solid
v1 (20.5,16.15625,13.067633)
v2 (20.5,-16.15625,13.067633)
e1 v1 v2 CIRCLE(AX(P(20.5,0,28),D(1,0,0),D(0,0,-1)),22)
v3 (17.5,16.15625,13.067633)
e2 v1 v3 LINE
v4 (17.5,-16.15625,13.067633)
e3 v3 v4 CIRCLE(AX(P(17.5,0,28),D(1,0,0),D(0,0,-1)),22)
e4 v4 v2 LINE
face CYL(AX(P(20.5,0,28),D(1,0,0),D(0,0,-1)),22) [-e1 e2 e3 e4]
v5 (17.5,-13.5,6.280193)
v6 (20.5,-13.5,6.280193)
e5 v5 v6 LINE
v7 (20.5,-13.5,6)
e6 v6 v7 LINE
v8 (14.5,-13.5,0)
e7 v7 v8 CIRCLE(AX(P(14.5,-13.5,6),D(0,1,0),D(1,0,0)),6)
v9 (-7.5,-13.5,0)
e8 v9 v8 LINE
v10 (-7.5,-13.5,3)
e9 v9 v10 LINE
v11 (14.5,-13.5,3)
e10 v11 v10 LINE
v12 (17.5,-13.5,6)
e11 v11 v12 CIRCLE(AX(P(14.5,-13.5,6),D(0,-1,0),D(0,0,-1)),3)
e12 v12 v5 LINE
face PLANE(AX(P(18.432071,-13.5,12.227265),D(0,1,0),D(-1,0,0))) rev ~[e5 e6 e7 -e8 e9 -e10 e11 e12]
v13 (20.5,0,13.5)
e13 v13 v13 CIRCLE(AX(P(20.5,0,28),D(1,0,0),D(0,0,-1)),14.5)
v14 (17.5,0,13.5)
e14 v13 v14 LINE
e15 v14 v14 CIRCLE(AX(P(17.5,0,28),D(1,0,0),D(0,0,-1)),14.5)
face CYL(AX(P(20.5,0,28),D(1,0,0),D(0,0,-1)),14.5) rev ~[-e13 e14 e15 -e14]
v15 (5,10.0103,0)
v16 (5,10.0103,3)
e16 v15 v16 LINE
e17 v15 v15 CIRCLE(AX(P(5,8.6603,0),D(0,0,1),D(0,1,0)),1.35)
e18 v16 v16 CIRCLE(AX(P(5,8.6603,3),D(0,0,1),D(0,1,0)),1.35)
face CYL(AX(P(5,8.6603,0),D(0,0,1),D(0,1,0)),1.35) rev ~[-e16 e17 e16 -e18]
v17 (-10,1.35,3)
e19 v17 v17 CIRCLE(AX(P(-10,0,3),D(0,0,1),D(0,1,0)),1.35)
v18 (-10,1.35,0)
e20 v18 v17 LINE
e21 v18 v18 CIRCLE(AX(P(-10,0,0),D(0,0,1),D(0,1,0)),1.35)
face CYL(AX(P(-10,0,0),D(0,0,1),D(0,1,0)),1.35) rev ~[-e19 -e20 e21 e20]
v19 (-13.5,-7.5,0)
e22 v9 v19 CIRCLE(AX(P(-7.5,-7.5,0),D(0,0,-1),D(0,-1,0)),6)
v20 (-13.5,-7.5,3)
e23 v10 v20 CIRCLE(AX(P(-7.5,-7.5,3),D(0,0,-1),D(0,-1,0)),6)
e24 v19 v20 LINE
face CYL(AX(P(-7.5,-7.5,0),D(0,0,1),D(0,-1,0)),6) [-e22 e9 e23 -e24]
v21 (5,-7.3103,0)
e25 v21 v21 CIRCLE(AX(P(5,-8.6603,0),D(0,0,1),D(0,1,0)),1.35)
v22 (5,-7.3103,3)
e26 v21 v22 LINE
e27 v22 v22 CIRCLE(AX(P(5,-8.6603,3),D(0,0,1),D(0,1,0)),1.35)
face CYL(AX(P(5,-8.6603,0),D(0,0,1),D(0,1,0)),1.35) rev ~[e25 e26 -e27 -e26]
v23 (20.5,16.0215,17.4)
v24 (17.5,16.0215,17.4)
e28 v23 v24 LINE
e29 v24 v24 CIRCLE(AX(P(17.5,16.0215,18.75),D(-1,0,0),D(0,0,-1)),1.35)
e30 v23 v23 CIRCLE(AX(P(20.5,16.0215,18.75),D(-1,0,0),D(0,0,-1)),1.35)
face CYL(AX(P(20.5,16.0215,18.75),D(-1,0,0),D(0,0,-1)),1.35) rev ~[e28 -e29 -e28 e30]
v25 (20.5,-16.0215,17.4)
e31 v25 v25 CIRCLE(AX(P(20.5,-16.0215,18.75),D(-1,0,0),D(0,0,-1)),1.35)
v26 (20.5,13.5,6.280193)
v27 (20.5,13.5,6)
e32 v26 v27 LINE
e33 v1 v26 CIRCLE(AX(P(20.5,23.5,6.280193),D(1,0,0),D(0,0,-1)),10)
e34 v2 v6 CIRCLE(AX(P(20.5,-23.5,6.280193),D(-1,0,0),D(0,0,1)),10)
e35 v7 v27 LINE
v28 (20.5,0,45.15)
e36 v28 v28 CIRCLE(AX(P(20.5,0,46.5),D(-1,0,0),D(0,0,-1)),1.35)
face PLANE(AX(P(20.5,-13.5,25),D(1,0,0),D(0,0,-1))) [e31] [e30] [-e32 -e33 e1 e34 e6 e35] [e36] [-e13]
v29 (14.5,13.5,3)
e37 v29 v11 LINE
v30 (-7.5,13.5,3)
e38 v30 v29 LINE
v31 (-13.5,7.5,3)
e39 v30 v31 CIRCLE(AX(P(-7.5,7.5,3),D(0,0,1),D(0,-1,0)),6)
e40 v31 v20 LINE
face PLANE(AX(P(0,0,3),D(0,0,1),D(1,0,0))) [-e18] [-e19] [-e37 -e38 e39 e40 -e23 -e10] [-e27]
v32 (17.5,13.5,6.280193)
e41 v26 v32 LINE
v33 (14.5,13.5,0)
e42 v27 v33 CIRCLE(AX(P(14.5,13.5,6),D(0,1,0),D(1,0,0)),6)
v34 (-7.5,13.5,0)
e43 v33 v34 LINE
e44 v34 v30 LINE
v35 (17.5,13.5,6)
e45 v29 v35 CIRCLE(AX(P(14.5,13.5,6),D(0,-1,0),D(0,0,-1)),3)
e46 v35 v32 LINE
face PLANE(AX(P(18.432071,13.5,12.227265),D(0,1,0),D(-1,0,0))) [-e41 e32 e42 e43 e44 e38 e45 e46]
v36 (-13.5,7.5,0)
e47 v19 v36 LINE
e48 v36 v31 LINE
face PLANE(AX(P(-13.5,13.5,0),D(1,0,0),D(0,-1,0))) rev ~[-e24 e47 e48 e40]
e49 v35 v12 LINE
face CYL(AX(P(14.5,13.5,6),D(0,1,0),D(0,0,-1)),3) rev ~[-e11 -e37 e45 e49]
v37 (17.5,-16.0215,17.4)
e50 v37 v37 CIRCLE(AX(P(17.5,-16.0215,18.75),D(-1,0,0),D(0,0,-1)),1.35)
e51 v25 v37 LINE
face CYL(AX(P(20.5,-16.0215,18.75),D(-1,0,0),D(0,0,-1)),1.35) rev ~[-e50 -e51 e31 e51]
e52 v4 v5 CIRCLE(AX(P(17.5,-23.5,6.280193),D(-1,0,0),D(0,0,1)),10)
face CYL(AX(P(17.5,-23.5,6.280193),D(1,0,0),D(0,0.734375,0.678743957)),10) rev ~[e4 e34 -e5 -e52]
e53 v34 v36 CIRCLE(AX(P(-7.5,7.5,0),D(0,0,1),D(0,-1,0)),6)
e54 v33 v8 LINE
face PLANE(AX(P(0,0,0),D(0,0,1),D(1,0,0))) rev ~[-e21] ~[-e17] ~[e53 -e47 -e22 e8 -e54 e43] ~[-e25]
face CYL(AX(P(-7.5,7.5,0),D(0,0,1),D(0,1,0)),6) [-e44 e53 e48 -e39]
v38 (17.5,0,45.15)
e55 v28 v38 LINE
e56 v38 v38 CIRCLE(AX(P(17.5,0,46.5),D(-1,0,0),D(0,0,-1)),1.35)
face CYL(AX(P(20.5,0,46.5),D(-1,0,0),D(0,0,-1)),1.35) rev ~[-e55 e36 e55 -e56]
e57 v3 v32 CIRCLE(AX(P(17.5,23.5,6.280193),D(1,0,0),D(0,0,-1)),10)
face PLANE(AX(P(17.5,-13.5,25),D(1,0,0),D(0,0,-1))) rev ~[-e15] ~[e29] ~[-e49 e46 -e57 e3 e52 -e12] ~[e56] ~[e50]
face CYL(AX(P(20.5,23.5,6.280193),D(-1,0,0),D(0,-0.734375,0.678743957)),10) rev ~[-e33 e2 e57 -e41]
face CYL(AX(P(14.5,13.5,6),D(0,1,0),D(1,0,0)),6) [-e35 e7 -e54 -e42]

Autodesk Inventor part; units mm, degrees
ref_plane "YZ Plane" through (0, 0, 0) normal (1, 0, 0) x (0, 1, 0)
ref_plane "XZ Plane" through (0, 0, 0) normal (0, 1, 0) x (-1, 0, 0)
ref_plane "XY Plane" through (0, 0, 0) normal (0, 0, 1) x (1, 0, 0)
sketch "スケッチ1" plane through (0, 0, 0) normal (0, 0, 1) x (1, 0, 0)
  circle A0 centre (0, 0) radius 13.5
  line L0 (0, 13.5) -> (14.5, 13.5)
  line L1 (14.5, 13.5) -> (14.5, -13.5)
  line L2 (14.5, -13.5) -> (0, -13.5)
  line L3 (0, -13.5) -> (0, 13.5)
  line L4 (0, 0) -> (14.5, 0) construction
  point P0 (0, 13.5)
  point P1 (0, -13.5)
  point P2 (0, -13.5)
  dimension "d0" = 27
  dimension "d1" = 27
  dimension "d2" = 14.5
extrude "プレート1" add sketch "スケッチ1" along normal blind 3
sketch "スケッチ2" plane through (17.5, 13.5, 6) normal (1, 0, 0) x (0, 1, 0)
  line L0 (-27, 0) -> (0, 0)
  line L1 (0, 0) -> (0, 19)
  line L2 (0, 19) -> (-27, 19)
  line L3 (-27, 19) -> (-27, 0)
edge flange "フランジ1" height 25 angle 90 thickness 3 bend radius 3 thickness toward (1, 0, 0) relief tear relief width 3 relief depth 1.5 edges at (14.5, 0, 3) wall of the first edge with corners at (17.5, -13.5, 6) (17.5, 13.5, 6) (17.5, 13.5, 25) (17.5, -13.5, 25)
bend "曲げ1"
corner "コーナー1"
sketch "スケッチ3" plane through (0, 0, 0) normal (0, 0, -1) x (-1, 0, 0)
  point P0 (0, 0)
  point P1 (10, 0)
  point P2 (-5, 8.6603)
  point P3 (-5, -8.6603)
  dimension "d14" = 10
  dimension "d17" = 360
hole "穴1" at (-10, 0, 0) at (5, 8.6603, 0) at (5, -8.6603, 0) direction (0, 0, 1) diameter 2.7 depth 3
sketch "スケッチ4" plane through (20.5, -13.5, 25) normal (1, 0, 0) x (0, 0, -1)
  circle A0 centre (-3, 13.5) radius 22
  line L0 (25, 27) -> (25, 0) projected
  line L1 (0, 27) -> (19, 27) projected
  point P0 (25, 13.5)
  dimension "d26" = 44
  dimension "d29" = 28
  dimension "d46" = 13.5
extrude "押し出し1" add sketch "スケッチ4" against normal up to surface (3 mm away)
sketch "スケッチ5" plane through (20.5, -13.5, 6) normal (1, 0, 0) x (0, 0, -1)
  arc A0 (-4.629, 27) -> (-4.629, 0) centre (-22, 13.5) ccw projected
  circle A1 centre (-22, 13.5) radius 14.5
  point P0 (6, 13.5)
  dimension "d30" = 29
extrude "押し出し2" cut sketch "スケッチ5" against normal up to surface (3 mm away)
sketch "スケッチ6" plane through (20.5, 0, 28) normal (1, 0, 0) x (0, 0, 1)
  point P0 (-28, 0)
sketch "スケッチ7" plane through (20.5, -13.5, 6) normal (1, 0, 0) x (0, 0, -1)
  circle A0 centre (-22, 13.5) radius 14.5 projected
  point P0 (6, 13.5)
  point P1 (-40.5, 13.5)
  point P2 (-12.75, -2.5215)
  point P3 (-12.75, 29.5215)
  dimension "d33" = 18.5
  dimension "d36" = 360
hole "穴2" at (20.5, 0, 46.5) at (20.5, -16.0215, 18.75) at (20.5, 16.0215, 18.75) direction (-1, 0, 0) diameter 2.7 depth 3
fillet "フィレット1" radius 10 2 edges at (19, -13.5, 10.629) (19, 13.5, 10.629)
sketch "スケッチ8" plane through (0, 0, 0) normal (0, 0, -1) x (-1, 0, 0)
  line L0 (0, 13.5) -> (-14.5, 13.5) projected
  line L1 (0, 13.5) -> (13.5, 13.5)
  line L2 (13.5, 13.5) -> (13.5, -13.5)
  line L3 (13.5, -13.5) -> (0, -13.5)
  line L4 (0, -13.5) -> (0, 13.5)
  circle A0 centre (-5, -8.6603) radius 1.35 projected
  circle A1 centre (-5, 8.6603) radius 1.35 projected
  circle A2 centre (10, 0) radius 1.35 projected
  line L5 (0, 13.5) -> (-14.5, 13.5) projected
  line L6 (-14.5, 13.5) -> (-14.5, -13.5) projected
  line L7 (-14.5, -13.5) -> (0, -13.5) projected
  arc A3 (0, -13.5) -> (0, 13.5) centre (0, 0) ccw projected
  point P0 (13.5, 0)
  dimension "d47" = 13.5
  dimension "d48" = 27
extrude "押し出し3" add sketch "スケッチ8" against normal up to surface (3 mm away) contours L1 L2 A3 | A3 L2 L3
fillet "フィレット2" radius 6 2 edges at (-13.5, 13.5, 1.5) (-13.5, -13.5, 1.5)
equation "\"d24\" = Thickness"
equation "\"d3\" = Thickness"
equation "\"d4\" = BendReliefWidth"
equation "\"d5\" = BendReliefDepth"
equation "\"d6\" = MinimumRemnant"
equation "\"d7\" = TransitionRadius"
equation "\"d10\" = BendRadius"
equation "\"d11\" = CornerReliefSize"
equation "\"d12\" = GapSize"
equation "\"d13\" = JacobiRadiusSize"
equation "\"BendRadius\" = Thickness"
equation "\"BendReliefWidth\" = Thickness"
equation "\"BendReliefDepth\" = 0.5 * Thickness"
equation "\"CornerReliefSize\" = 4 * Thickness"
equation "\"MinimumRemnant\" = 2 * Thickness"
equation "\"TransitionRadius\" = BendRadius"
equation "\"JacobiRadiusSize\" = BendRadius"
equation "\"GapSize\" = Thickness"
equation "\"Thickness\" = 3"
properties part number "wrist_yaw_plate" material "アルミニウム 6061"
